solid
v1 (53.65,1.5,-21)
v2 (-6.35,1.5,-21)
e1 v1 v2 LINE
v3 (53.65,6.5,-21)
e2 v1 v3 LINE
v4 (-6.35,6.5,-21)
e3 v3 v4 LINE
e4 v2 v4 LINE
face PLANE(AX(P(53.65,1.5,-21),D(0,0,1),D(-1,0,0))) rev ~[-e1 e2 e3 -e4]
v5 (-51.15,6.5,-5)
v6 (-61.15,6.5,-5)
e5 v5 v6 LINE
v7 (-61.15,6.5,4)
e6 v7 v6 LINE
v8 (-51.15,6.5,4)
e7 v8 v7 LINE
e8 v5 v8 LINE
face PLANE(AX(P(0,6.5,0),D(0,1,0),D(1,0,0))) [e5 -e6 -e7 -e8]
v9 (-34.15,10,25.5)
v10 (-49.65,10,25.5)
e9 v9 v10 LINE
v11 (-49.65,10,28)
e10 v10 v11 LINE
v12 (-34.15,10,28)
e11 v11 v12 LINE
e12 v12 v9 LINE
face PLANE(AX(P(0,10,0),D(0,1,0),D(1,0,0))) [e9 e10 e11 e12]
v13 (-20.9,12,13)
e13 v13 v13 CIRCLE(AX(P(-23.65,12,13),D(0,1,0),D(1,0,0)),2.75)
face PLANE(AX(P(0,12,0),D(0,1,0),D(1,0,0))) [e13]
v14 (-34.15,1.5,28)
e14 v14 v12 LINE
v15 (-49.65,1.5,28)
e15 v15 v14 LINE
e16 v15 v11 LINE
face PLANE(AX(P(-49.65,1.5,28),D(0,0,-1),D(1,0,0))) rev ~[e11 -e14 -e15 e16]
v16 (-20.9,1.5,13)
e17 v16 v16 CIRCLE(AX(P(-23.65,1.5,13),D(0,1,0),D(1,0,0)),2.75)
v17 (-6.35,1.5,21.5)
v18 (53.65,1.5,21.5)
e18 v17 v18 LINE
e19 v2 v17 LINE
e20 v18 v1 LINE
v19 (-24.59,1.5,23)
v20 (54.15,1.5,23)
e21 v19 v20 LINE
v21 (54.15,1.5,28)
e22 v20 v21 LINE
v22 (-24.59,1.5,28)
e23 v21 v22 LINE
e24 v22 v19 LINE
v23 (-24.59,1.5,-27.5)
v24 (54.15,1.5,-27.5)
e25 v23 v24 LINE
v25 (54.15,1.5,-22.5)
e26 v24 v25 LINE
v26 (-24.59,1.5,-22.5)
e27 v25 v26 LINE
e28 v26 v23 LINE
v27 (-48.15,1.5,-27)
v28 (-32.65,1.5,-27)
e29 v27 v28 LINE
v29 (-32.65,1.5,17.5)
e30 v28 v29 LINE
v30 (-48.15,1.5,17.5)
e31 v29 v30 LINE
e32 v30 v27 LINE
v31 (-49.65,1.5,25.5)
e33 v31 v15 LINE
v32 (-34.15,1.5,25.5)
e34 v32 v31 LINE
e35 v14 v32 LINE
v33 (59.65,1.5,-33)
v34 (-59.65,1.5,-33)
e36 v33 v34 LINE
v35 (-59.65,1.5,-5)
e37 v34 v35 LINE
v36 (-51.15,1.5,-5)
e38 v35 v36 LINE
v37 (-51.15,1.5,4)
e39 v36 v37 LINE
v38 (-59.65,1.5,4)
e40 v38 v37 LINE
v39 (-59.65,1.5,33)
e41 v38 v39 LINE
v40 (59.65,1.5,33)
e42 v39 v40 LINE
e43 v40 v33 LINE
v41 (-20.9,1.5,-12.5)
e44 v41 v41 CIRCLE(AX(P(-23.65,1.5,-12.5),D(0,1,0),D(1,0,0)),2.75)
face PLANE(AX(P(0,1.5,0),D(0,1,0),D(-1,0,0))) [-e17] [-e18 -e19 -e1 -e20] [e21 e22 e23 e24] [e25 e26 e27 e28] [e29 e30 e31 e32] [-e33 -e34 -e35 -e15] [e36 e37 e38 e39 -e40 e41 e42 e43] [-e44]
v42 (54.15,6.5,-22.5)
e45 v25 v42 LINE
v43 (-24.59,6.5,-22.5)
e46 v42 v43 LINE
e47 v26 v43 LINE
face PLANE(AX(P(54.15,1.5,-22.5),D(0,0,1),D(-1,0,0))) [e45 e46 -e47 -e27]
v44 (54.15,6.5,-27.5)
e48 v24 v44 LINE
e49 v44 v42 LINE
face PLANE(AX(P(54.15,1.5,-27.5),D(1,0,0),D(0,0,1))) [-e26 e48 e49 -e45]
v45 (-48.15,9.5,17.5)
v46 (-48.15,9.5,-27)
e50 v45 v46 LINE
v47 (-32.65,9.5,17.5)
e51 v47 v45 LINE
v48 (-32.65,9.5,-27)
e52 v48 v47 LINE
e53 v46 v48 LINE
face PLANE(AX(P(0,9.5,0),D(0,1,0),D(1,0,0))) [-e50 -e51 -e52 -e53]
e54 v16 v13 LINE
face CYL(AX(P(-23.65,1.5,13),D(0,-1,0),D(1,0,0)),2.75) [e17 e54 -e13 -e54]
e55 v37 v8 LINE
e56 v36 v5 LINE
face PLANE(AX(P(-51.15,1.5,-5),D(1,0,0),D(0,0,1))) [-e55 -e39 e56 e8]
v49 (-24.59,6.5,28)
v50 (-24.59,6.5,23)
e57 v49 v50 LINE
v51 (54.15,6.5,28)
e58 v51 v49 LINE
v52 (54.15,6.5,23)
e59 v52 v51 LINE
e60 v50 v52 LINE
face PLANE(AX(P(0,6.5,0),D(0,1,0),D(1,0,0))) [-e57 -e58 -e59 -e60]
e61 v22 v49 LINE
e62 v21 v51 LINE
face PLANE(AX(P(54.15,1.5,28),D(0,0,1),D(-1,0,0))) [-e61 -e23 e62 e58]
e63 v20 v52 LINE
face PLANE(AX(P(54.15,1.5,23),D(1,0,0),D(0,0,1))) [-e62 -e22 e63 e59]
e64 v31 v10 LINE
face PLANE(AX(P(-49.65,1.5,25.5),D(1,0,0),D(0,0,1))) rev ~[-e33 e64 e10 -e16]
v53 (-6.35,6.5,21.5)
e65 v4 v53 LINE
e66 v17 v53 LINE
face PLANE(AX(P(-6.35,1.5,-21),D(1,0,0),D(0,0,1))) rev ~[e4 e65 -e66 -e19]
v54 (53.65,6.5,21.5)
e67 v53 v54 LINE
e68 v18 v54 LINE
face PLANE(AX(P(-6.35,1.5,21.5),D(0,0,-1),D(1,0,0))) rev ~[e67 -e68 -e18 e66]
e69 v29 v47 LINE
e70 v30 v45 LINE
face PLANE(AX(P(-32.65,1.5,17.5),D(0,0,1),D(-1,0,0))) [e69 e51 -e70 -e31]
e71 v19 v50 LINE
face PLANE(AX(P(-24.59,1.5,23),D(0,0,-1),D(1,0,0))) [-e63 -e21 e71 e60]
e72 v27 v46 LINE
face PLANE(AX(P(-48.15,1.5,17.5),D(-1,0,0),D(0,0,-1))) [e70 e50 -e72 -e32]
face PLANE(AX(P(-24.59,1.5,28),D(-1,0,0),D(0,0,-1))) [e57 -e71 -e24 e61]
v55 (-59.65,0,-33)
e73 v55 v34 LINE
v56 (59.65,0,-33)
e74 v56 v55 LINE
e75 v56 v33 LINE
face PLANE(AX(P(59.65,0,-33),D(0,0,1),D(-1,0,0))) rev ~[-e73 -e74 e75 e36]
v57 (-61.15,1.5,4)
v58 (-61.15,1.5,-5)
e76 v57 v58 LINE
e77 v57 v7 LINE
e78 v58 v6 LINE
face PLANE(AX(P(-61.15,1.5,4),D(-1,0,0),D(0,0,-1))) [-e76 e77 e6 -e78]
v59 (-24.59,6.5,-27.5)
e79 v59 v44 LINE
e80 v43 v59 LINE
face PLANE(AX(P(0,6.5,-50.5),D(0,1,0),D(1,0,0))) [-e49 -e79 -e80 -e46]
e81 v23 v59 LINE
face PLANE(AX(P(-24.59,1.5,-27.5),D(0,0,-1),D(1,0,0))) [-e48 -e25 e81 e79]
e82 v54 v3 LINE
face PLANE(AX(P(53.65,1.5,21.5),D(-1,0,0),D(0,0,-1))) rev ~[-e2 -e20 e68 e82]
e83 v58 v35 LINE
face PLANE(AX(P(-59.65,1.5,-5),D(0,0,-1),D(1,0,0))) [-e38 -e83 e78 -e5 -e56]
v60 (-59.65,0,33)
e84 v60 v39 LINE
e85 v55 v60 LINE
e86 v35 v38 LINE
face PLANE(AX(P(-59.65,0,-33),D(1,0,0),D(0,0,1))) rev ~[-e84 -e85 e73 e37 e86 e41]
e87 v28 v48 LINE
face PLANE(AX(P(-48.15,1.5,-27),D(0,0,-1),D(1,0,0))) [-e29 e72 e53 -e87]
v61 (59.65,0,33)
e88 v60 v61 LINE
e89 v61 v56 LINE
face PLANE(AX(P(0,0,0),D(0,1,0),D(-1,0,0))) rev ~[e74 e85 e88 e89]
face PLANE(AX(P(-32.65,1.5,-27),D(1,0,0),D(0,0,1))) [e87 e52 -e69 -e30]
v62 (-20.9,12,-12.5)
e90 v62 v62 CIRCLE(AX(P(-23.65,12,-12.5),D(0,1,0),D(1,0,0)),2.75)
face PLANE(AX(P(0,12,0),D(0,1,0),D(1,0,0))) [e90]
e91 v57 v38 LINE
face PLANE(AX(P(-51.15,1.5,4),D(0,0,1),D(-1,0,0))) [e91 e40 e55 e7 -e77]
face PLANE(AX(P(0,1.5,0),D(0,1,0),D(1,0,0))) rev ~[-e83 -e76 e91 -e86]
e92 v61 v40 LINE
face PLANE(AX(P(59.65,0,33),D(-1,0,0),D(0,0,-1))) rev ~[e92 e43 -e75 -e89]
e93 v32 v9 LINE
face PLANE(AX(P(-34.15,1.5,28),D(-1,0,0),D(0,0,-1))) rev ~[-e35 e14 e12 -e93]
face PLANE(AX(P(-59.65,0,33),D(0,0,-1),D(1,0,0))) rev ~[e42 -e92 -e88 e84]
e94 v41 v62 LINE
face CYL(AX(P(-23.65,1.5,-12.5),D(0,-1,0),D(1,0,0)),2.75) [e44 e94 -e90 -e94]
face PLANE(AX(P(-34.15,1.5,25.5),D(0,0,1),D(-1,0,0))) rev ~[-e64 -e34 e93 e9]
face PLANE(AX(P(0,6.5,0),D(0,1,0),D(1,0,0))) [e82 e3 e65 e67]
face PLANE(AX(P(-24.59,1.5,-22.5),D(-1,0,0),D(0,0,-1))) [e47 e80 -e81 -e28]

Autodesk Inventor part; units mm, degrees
ref_plane "YZ Plane" through (0, 0, 0) normal (1, 0, 0) x (0, 1, 0)
ref_plane "XZ Plane" through (0, 0, 0) normal (0, 1, 0) x (-1, 0, 0)
ref_plane "XY Plane" through (0, 0, 0) normal (0, 0, 1) x (1, 0, 0)
sketch "Szkic1" plane through (0, 0, 0) normal (0, 1, 0) x (-1, 0, 0)
  line L0 (-59.65, -33) -> (59.65, -33)
  line L1 (59.65, -33) -> (59.65, 33)
  line L2 (59.65, 33) -> (-59.65, 33)
  line L3 (-59.65, 33) -> (-59.65, -33)
  line L4 (-59.65, -33) -> (59.65, 33) construction
  line L5 (59.65, -33) -> (-59.65, 33) construction
  point P0 (0, 0)
  dimension "d0" = 119.3
  dimension "d1" = 66
extrude "Wyciągnięcie proste1" add sketch "Szkic1" along normal blind 1.5
sketch "Szkic3" plane through (0, 1.5, 0) normal (0, 1, 0) x (1, 0, 0)
  line L0 (54.15, -28) -> (-24.59, -28)
  line L1 (-24.59, -28) -> (-24.59, -23)
  line L2 (-24.59, -23) -> (54.15, -23)
  line L3 (54.15, -23) -> (54.15, -28)
  line L4 (-59.65, -33) -> (59.65, -33) projected
  line L5 (59.65, -33) -> (59.65, 33) projected
  line L6 (83.51, 0) -> (-83.51, 0) projected
  point P0 (0, 0)
  dimension "d9" = 78.74
  dimension "d10" = 5
  dimension "d11" = 5
  dimension "d12" = 5.5
extrude "Wyciągnięcie proste6" add sketch "Szkic3" along normal blind 5
sketch "Szkic4" plane through (0, 1.5, 0) normal (0, 1, 0) x (1, 0, 0)
  line L0 (-34.15, -25.5) -> (-49.65, -25.5)
  line L1 (-49.65, -25.5) -> (-49.65, -28)
  line L2 (-49.65, -28) -> (-34.15, -28)
  line L3 (-34.15, -28) -> (-34.15, -25.5)
  line L4 (-59.65, -33) -> (59.65, -33) projected
  line L5 (-59.65, 33) -> (-59.65, -33) projected
  point P0 (0, 0)
  dimension "d17" = 15.5
  dimension "d18" = 2.5
  dimension "d61" = 10
  dimension "d62" = 5
extrude "Wyciągnięcie proste4" add sketch "Szkic4" along normal blind 8.5
sketch "Szkic5" plane through (0, 1.5, 0) normal (0, 1, 0) x (1, 0, 0)
  line L0 (53.65, 21) -> (-6.35, 21)
  line L1 (-6.35, 21) -> (-6.35, -21.5)
  line L2 (-6.35, -21.5) -> (53.65, -21.5)
  line L3 (53.65, -21.5) -> (53.65, 21)
  line L4 (53.65, 21) -> (-6.35, -21.5) construction
  line L5 (-6.35, 21) -> (53.65, -21.5) construction
  line L6 (59.65, -33) -> (59.65, 33) projected
  line L7 (-59.65, -33) -> (59.65, -33) projected
  point P0 (0, 0)
  point P1 (23.65, -0.25)
  dimension "d25" = 60
  dimension "d26" = 42.5
  dimension "d28" = 6
  dimension "d36" = 11.5
extrude "Wyciągnięcie proste5" add sketch "Szkic5" along normal blind 5
pattern_linear "Szyk prostokątny1" count 2 spacing 50.5 along (0, 0, -1) of "Wyciągnięcie proste6"
sketch "Szkic6" plane through (0, 1.5, 0) normal (0, 1, 0) x (1, 0, 0)
  line L0 (-51.15, -4) -> (-61.15, -4)
  line L1 (-61.15, -4) -> (-61.15, 5)
  line L2 (-61.15, 5) -> (-51.15, 5)
  line L3 (-51.15, 5) -> (-51.15, -4)
  line L4 (-51.15, -4) -> (-61.15, 5) construction
  line L5 (-61.15, -4) -> (-51.15, 5) construction
  line L6 (-59.65, -33) -> (59.65, -33) projected
  line L7 (-59.65, 33) -> (-59.65, -33) projected
  point P0 (0, 0)
  point P1 (-56.15, 0.5)
  dimension "d37" = 10
  dimension "d38" = 9
  dimension "d39" = 29
  dimension "d40" = 1.5
extrude "Wyciągnięcie proste7" add sketch "Szkic6" along normal blind 5
sketch "Szkic7" plane through (0, 1.5, 0) normal (0, 1, 0) x (1, 0, 0)
  circle A0 centre (-23.65, -13) radius 2.75
  line L0 (-59.65, 33) -> (-59.65, 5) projected
  circle A1 centre (-23.65, 12.5) radius 2.75
  line L1 (-59.65, -33) -> (59.65, -33) projected
  point P0 (0, 0)
  dimension "d43" = 5.5
  dimension "d46" = 25.5
  dimension "d51" = 20
  dimension "d52" = 36
extrude "Wyciągnięcie proste8" add sketch "Szkic7" along normal blind 10.5
sketch "Szkic8" plane through (0, 1.5, 0) normal (0, 1, 0) x (1, 0, 0)
  line L0 (-32.65, -17.5) -> (-48.15, -17.5)
  line L1 (-48.15, -17.5) -> (-48.15, 27)
  line L2 (-48.15, 27) -> (-32.65, 27)
  line L3 (-32.65, 27) -> (-32.65, -17.5)
  line L4 (-32.65, -17.5) -> (-48.15, 27) construction
  line L5 (-48.15, -17.5) -> (-32.65, 27) construction
  line L6 (-59.65, -33) -> (59.65, -33) projected
  line L7 (-59.65, -4) -> (-59.65, -33) projected
  point P0 (0, 0)
  point P1 (-40.4, 4.75)
  dimension "d55" = 15.5
  dimension "d56" = 27
  dimension "d57" = 44.5
  dimension "d58" = 15.5
extrude "Wyciągnięcie proste9" add sketch "Szkic8" along normal blind 8
properties part number "stm32f429"
